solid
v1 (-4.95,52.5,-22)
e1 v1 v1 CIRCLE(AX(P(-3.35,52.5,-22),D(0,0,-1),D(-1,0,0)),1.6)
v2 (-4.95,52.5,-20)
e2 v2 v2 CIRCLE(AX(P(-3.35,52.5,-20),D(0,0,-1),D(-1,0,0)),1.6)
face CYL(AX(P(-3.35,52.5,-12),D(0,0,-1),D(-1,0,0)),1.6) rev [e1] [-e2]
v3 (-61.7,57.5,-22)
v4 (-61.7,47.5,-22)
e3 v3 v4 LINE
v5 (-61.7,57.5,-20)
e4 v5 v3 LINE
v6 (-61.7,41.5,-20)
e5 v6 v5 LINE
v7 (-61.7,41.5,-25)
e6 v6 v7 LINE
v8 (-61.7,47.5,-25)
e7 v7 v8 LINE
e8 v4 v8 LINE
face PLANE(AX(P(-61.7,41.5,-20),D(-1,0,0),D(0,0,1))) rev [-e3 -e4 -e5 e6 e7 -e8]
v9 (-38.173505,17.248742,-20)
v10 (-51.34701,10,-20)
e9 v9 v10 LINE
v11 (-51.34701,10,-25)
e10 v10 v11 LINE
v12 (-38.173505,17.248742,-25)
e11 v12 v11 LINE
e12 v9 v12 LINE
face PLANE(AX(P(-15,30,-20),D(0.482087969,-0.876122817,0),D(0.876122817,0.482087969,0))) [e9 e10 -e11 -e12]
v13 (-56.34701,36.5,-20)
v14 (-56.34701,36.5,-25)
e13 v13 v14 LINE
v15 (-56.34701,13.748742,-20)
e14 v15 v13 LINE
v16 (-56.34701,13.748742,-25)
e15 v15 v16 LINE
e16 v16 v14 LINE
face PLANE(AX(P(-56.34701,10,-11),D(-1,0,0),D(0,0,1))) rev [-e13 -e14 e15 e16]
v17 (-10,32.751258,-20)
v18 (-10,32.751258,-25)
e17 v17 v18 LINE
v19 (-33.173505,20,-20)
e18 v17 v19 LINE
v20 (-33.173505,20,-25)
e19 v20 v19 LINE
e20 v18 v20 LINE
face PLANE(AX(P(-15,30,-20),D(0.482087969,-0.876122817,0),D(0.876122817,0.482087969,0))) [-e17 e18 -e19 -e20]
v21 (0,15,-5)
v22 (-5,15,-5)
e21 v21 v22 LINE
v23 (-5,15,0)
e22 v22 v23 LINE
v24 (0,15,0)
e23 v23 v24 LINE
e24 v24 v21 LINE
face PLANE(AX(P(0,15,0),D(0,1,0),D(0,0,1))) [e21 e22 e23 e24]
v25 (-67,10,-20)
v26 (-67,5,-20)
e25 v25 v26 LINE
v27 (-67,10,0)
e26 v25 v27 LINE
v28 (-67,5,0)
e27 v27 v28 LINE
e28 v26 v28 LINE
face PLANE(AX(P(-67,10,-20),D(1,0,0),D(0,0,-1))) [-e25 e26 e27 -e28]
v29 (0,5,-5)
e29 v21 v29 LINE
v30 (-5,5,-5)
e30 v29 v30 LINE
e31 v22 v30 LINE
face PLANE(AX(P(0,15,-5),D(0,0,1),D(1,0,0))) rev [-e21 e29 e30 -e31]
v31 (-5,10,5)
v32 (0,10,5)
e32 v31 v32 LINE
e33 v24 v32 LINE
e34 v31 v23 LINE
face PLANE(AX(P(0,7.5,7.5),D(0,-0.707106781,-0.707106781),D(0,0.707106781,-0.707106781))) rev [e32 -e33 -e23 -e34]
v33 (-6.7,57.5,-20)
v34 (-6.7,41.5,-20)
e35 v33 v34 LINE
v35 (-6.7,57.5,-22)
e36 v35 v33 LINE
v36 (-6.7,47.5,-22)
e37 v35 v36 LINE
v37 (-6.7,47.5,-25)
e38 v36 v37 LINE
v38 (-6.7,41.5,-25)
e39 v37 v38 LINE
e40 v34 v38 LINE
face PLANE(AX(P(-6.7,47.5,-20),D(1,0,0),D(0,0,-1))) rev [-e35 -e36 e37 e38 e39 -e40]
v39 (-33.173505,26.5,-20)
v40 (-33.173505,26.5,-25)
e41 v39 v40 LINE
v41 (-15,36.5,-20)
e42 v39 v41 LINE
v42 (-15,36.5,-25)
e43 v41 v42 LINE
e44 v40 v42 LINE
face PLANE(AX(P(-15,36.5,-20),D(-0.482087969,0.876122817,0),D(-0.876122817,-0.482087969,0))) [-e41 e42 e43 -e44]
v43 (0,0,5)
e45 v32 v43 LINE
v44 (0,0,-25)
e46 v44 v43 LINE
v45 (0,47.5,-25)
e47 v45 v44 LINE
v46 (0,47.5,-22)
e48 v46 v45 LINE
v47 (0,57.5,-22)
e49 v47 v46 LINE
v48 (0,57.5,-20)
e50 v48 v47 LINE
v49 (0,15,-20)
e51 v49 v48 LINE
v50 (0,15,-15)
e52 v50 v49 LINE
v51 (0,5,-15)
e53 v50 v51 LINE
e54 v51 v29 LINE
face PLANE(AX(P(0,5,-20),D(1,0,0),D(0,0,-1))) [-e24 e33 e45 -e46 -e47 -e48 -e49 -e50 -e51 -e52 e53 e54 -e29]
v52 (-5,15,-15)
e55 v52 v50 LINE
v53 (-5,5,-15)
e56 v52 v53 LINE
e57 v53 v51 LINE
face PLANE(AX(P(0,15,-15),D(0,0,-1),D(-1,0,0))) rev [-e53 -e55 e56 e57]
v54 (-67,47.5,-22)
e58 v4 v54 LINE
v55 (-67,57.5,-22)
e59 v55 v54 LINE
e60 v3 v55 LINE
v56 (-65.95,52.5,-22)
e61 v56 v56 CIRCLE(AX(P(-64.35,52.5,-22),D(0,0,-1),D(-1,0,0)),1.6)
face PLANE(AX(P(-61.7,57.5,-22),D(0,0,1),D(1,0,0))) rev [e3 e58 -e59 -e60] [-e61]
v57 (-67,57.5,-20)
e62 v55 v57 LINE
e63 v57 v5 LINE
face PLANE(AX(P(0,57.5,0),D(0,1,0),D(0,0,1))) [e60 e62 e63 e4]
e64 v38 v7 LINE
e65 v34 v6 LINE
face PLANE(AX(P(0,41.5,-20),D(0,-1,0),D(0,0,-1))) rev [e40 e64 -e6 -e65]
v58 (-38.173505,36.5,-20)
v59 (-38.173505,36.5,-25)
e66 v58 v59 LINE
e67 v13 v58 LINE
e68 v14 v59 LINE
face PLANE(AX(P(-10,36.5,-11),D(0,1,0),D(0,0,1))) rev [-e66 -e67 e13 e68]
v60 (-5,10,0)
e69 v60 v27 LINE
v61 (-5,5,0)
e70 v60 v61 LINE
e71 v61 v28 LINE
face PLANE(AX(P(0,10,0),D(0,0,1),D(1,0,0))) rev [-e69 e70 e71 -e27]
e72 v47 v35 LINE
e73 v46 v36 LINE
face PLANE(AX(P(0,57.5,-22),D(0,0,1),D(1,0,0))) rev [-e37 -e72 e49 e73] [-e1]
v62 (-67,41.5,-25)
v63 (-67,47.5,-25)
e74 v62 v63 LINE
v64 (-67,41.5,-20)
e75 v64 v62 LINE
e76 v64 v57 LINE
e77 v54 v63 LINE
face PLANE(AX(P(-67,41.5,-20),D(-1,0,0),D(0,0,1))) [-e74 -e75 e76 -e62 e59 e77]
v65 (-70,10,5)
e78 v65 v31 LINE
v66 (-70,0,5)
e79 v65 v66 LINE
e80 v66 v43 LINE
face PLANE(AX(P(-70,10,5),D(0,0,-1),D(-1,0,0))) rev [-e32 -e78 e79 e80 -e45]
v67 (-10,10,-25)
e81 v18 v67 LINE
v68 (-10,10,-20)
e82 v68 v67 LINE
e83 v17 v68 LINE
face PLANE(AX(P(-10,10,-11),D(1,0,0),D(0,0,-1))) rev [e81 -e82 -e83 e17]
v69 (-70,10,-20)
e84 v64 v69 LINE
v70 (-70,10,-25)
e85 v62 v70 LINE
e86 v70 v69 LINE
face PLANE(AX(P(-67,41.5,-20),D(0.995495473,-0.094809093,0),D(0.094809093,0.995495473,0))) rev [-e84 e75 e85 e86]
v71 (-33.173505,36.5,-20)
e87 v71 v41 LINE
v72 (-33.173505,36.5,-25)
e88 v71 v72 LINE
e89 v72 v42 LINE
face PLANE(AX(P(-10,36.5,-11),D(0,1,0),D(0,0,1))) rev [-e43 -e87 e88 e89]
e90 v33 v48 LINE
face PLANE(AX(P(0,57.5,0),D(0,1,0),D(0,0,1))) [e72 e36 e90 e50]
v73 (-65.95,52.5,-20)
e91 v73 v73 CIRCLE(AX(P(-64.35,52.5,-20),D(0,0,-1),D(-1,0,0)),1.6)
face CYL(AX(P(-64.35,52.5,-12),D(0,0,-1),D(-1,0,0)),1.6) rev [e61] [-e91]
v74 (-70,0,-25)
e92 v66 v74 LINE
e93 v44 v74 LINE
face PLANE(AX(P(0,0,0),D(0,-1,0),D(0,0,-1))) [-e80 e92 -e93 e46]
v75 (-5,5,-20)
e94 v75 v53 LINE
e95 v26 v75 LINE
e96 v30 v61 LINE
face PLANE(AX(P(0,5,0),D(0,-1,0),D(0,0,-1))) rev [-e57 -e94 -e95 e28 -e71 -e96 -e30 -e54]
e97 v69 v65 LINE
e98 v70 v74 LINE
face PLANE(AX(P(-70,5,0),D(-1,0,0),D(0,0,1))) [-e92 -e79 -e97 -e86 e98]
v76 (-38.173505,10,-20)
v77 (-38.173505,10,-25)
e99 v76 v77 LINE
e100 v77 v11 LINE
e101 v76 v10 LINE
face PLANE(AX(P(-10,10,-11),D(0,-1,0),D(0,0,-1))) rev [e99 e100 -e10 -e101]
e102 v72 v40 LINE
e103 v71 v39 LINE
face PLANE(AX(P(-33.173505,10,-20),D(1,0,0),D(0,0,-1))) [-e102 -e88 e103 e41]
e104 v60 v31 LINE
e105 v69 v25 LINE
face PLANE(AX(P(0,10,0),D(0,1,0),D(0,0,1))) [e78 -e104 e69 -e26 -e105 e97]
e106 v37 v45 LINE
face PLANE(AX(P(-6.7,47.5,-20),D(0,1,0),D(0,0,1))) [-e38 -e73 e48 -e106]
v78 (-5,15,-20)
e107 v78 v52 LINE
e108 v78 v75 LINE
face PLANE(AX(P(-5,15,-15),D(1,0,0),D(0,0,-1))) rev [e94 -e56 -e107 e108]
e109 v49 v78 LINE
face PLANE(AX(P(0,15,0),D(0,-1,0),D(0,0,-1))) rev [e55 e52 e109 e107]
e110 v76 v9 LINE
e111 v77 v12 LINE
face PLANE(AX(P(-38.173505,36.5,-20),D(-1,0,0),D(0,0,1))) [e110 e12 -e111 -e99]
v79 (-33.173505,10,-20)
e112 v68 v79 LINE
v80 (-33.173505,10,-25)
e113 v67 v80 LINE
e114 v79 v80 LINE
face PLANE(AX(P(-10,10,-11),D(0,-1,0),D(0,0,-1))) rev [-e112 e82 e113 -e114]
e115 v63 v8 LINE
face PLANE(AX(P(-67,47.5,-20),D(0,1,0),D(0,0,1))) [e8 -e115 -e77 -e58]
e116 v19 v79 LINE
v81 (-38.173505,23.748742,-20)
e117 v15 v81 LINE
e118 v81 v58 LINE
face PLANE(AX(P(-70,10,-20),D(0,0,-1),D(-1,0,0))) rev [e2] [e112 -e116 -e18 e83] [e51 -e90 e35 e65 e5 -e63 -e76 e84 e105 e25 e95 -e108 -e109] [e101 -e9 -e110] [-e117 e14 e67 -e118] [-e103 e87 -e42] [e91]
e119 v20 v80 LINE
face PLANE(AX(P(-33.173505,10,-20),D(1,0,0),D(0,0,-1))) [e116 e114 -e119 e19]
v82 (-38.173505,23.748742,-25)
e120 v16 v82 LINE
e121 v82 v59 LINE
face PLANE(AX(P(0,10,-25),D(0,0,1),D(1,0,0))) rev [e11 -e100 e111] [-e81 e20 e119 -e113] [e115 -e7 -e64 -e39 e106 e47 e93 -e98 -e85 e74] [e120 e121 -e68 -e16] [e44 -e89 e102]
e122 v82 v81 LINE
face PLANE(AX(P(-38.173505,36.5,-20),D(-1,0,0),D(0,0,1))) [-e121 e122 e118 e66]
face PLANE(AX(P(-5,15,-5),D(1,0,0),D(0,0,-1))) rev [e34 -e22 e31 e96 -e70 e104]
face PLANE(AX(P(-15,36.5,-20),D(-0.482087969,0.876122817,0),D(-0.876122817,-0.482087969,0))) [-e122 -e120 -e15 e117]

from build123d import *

# Parameters (mm, degrees)
SKETCH2_W            = 70
SKETCH2_H            = 20
BOSS_EXTRUDE1_DEPTH  = 5
SKETCH3_W            = 70
SKETCH3_H            = 5
BOSS_EXTRUDE2_DEPTH  = 10
SKETCH4_W            = 5
SKETCH4_H            = 5
BOSS_EXTRUDE3_DEPTH  = 10
LOFT1_START          = -5
LOFT1_DEPTH          = 5
SKETCH7_W            = 3
SKETCH7_H            = 20
BOSS_EXTRUDE4_DEPTH  = 5
LOFT2_START          = -5
LOFT2_DEPTH          = 5
BOSS_EXTRUDE5_DEPTH  = 5
SKETCH12_W           = 46.347010245
SKETCH12_H           = 26.5
CUT_EXTRUDE1_DEPTH   = 14
BOSS_EXTRUDE6_DEPTH  = 5
BOSS_EXTRUDE7_DEPTH  = 5
SKETCH17_W           = 6.7
SKETCH17_H           = 6
BOSS_EXTRUDE8_DEPTH  = 5
SKETCH18_W           = 5.3
SKETCH18_H           = 6
BOSS_EXTRUDE9_DEPTH  = 5
SKETCH23_W           = 6.7
SKETCH23_H           = 2
SKETCH23_W_2         = 5.3
BOSS_EXTRUDE12_DEPTH = 10
SKETCH24_R           = 1.6
CUT_EXTRUDE4_DEPTH   = 10


# Read off the part's stored shape, not the designer's step: Loft1, Loft2
with BuildPart() as part:
    # Sketch2 → Boss-Extrude1 (new body)
    with BuildSketch(Plane(origin=(0, 0, 0), x_dir=(1, 0, 0), z_dir=(0, 1, 0))):
        with Locations((-35, 10)):
            Rectangle(SKETCH2_W, SKETCH2_H)
    extrude(amount=BOSS_EXTRUDE1_DEPTH)

    # Sketch3 → Boss-Extrude2 (add)
    with BuildSketch(Plane(origin=(0, 0, 0), x_dir=(1, 0, 0), z_dir=(0, 1, 0))):
        with Locations((-35, 22.5)):
            Rectangle(SKETCH3_W, SKETCH3_H)
        with Locations((-35, -2.5)):
            Rectangle(SKETCH3_W, SKETCH3_H)
    extrude(amount=BOSS_EXTRUDE2_DEPTH)

    # Sketch4 → Boss-Extrude3 (add)
    with BuildSketch(Plane(origin=(0, 5, 0), x_dir=(1, 0, 0), z_dir=(0, 1, 0))):
        with Locations((-2.5, 2.5)):
            Rectangle(SKETCH4_W, SKETCH4_H)
        with Locations((-2.5, 17.5)):
            Rectangle(SKETCH4_W, SKETCH4_H)
    extrude(amount=BOSS_EXTRUDE3_DEPTH)

    # Loft1 outline → Loft1 (add)
    with BuildSketch(Plane.YZ.offset(LOFT1_START)):
        Polygon((15, 0), (10, 5), (10, 0), align=None)
    extrude(amount=LOFT1_DEPTH)

    # Sketch7 → Boss-Extrude4 (add)
    with BuildSketch(Plane(origin=(0, 5, 0), x_dir=(1, 0, 0), z_dir=(0, 1, 0))):
        with Locations((-68.5, 10)):
            Rectangle(SKETCH7_W, SKETCH7_H)
    extrude(amount=BOSS_EXTRUDE4_DEPTH)

    # Loft2 outline → Loft2 (add)
    with BuildSketch(Plane.YZ.offset(LOFT2_START)):
        Polygon((10, -25), (15, -20), (10, -20), align=None)
    extrude(amount=LOFT2_DEPTH)

    # Sketch10 → Boss-Extrude5 (add)
    with BuildSketch(Plane(origin=(0, 0, -25), x_dir=(-1, 0, 0), z_dir=(0, 0, -1))):
        Polygon((0, 10), (0, 41.5), (67, 41.5), (70, 10), align=None)
    extrude(amount=-BOSS_EXTRUDE5_DEPTH)

    # Sketch12 → Cut-Extrude1 (cut)
    with BuildSketch(Plane(origin=(0, 0, -25), x_dir=(-1, 0, 0), z_dir=(0, 0, -1))):
        with Locations((33.173505123, 23.25)):
            Rectangle(SKETCH12_W, SKETCH12_H)
    extrude(amount=-CUT_EXTRUDE1_DEPTH, mode=Mode.SUBTRACT)

    # Sketch13 → Boss-Extrude6 (add)
    with BuildSketch(Plane(origin=(0, 0, -25), x_dir=(-1, 0, 0), z_dir=(0, 0, -1))):
        Polygon((15, 30), (51.347010245, 10), (56.347010245, 10), (56.347010245, 13.748742075), (51.347010245, 16.5), (15, 36.5), (10, 36.5), (10, 32.751257925), align=None)
    extrude(amount=-BOSS_EXTRUDE6_DEPTH)

    # Sketch14 → Boss-Extrude7 (add)
    with BuildSketch(Plane(origin=(0, 0, -25), x_dir=(-1, 0, 0), z_dir=(0, 0, -1))):
        Polygon((35.673505122, 36.5), (33.173505122, 36.5), (33.173505122, 10), (38.173505122, 10), (38.173505122, 36.5), align=None)
    extrude(amount=-BOSS_EXTRUDE7_DEPTH)

    # Sketch17 → Boss-Extrude8 (add)
    with BuildSketch(Plane(origin=(0, 0, -25), x_dir=(-1, 0, 0), z_dir=(0, 0, -1))):
        with Locations((3.35, 44.5)):
            Rectangle(SKETCH17_W, SKETCH17_H)
    extrude(amount=-BOSS_EXTRUDE8_DEPTH)

    # Sketch18 → Boss-Extrude9 (add)
    with BuildSketch(Plane(origin=(0, 0, -25), x_dir=(-1, 0, 0), z_dir=(0, 0, -1))):
        with Locations((64.35, 44.5)):
            Rectangle(SKETCH18_W, SKETCH18_H)
    extrude(amount=-BOSS_EXTRUDE9_DEPTH)

    # Sketch23 → Boss-Extrude12 (add)
    with BuildSketch(Plane(origin=(0, 47.5, 0), x_dir=(1, 0, 0), z_dir=(0, 1, 0))):
        with Locations((-3.35, 21)):
            Rectangle(SKETCH23_W, SKETCH23_H)
        with Locations((-64.35, 21)):
            Rectangle(SKETCH23_W_2, SKETCH23_H)
    extrude(amount=BOSS_EXTRUDE12_DEPTH)

    # Sketch24 → Cut-Extrude4 (cut)
    with BuildSketch(Plane(origin=(0, 0, -22), x_dir=(-1, 0, 0), z_dir=(0, 0, -1))):
        with Locations((3.35, 52.5)):
            Circle(SKETCH24_R)
        with Locations((64.35, 52.5)):
            Circle(SKETCH24_R)
    extrude(amount=-CUT_EXTRUDE4_DEPTH, mode=Mode.SUBTRACT)


solid = part.part
